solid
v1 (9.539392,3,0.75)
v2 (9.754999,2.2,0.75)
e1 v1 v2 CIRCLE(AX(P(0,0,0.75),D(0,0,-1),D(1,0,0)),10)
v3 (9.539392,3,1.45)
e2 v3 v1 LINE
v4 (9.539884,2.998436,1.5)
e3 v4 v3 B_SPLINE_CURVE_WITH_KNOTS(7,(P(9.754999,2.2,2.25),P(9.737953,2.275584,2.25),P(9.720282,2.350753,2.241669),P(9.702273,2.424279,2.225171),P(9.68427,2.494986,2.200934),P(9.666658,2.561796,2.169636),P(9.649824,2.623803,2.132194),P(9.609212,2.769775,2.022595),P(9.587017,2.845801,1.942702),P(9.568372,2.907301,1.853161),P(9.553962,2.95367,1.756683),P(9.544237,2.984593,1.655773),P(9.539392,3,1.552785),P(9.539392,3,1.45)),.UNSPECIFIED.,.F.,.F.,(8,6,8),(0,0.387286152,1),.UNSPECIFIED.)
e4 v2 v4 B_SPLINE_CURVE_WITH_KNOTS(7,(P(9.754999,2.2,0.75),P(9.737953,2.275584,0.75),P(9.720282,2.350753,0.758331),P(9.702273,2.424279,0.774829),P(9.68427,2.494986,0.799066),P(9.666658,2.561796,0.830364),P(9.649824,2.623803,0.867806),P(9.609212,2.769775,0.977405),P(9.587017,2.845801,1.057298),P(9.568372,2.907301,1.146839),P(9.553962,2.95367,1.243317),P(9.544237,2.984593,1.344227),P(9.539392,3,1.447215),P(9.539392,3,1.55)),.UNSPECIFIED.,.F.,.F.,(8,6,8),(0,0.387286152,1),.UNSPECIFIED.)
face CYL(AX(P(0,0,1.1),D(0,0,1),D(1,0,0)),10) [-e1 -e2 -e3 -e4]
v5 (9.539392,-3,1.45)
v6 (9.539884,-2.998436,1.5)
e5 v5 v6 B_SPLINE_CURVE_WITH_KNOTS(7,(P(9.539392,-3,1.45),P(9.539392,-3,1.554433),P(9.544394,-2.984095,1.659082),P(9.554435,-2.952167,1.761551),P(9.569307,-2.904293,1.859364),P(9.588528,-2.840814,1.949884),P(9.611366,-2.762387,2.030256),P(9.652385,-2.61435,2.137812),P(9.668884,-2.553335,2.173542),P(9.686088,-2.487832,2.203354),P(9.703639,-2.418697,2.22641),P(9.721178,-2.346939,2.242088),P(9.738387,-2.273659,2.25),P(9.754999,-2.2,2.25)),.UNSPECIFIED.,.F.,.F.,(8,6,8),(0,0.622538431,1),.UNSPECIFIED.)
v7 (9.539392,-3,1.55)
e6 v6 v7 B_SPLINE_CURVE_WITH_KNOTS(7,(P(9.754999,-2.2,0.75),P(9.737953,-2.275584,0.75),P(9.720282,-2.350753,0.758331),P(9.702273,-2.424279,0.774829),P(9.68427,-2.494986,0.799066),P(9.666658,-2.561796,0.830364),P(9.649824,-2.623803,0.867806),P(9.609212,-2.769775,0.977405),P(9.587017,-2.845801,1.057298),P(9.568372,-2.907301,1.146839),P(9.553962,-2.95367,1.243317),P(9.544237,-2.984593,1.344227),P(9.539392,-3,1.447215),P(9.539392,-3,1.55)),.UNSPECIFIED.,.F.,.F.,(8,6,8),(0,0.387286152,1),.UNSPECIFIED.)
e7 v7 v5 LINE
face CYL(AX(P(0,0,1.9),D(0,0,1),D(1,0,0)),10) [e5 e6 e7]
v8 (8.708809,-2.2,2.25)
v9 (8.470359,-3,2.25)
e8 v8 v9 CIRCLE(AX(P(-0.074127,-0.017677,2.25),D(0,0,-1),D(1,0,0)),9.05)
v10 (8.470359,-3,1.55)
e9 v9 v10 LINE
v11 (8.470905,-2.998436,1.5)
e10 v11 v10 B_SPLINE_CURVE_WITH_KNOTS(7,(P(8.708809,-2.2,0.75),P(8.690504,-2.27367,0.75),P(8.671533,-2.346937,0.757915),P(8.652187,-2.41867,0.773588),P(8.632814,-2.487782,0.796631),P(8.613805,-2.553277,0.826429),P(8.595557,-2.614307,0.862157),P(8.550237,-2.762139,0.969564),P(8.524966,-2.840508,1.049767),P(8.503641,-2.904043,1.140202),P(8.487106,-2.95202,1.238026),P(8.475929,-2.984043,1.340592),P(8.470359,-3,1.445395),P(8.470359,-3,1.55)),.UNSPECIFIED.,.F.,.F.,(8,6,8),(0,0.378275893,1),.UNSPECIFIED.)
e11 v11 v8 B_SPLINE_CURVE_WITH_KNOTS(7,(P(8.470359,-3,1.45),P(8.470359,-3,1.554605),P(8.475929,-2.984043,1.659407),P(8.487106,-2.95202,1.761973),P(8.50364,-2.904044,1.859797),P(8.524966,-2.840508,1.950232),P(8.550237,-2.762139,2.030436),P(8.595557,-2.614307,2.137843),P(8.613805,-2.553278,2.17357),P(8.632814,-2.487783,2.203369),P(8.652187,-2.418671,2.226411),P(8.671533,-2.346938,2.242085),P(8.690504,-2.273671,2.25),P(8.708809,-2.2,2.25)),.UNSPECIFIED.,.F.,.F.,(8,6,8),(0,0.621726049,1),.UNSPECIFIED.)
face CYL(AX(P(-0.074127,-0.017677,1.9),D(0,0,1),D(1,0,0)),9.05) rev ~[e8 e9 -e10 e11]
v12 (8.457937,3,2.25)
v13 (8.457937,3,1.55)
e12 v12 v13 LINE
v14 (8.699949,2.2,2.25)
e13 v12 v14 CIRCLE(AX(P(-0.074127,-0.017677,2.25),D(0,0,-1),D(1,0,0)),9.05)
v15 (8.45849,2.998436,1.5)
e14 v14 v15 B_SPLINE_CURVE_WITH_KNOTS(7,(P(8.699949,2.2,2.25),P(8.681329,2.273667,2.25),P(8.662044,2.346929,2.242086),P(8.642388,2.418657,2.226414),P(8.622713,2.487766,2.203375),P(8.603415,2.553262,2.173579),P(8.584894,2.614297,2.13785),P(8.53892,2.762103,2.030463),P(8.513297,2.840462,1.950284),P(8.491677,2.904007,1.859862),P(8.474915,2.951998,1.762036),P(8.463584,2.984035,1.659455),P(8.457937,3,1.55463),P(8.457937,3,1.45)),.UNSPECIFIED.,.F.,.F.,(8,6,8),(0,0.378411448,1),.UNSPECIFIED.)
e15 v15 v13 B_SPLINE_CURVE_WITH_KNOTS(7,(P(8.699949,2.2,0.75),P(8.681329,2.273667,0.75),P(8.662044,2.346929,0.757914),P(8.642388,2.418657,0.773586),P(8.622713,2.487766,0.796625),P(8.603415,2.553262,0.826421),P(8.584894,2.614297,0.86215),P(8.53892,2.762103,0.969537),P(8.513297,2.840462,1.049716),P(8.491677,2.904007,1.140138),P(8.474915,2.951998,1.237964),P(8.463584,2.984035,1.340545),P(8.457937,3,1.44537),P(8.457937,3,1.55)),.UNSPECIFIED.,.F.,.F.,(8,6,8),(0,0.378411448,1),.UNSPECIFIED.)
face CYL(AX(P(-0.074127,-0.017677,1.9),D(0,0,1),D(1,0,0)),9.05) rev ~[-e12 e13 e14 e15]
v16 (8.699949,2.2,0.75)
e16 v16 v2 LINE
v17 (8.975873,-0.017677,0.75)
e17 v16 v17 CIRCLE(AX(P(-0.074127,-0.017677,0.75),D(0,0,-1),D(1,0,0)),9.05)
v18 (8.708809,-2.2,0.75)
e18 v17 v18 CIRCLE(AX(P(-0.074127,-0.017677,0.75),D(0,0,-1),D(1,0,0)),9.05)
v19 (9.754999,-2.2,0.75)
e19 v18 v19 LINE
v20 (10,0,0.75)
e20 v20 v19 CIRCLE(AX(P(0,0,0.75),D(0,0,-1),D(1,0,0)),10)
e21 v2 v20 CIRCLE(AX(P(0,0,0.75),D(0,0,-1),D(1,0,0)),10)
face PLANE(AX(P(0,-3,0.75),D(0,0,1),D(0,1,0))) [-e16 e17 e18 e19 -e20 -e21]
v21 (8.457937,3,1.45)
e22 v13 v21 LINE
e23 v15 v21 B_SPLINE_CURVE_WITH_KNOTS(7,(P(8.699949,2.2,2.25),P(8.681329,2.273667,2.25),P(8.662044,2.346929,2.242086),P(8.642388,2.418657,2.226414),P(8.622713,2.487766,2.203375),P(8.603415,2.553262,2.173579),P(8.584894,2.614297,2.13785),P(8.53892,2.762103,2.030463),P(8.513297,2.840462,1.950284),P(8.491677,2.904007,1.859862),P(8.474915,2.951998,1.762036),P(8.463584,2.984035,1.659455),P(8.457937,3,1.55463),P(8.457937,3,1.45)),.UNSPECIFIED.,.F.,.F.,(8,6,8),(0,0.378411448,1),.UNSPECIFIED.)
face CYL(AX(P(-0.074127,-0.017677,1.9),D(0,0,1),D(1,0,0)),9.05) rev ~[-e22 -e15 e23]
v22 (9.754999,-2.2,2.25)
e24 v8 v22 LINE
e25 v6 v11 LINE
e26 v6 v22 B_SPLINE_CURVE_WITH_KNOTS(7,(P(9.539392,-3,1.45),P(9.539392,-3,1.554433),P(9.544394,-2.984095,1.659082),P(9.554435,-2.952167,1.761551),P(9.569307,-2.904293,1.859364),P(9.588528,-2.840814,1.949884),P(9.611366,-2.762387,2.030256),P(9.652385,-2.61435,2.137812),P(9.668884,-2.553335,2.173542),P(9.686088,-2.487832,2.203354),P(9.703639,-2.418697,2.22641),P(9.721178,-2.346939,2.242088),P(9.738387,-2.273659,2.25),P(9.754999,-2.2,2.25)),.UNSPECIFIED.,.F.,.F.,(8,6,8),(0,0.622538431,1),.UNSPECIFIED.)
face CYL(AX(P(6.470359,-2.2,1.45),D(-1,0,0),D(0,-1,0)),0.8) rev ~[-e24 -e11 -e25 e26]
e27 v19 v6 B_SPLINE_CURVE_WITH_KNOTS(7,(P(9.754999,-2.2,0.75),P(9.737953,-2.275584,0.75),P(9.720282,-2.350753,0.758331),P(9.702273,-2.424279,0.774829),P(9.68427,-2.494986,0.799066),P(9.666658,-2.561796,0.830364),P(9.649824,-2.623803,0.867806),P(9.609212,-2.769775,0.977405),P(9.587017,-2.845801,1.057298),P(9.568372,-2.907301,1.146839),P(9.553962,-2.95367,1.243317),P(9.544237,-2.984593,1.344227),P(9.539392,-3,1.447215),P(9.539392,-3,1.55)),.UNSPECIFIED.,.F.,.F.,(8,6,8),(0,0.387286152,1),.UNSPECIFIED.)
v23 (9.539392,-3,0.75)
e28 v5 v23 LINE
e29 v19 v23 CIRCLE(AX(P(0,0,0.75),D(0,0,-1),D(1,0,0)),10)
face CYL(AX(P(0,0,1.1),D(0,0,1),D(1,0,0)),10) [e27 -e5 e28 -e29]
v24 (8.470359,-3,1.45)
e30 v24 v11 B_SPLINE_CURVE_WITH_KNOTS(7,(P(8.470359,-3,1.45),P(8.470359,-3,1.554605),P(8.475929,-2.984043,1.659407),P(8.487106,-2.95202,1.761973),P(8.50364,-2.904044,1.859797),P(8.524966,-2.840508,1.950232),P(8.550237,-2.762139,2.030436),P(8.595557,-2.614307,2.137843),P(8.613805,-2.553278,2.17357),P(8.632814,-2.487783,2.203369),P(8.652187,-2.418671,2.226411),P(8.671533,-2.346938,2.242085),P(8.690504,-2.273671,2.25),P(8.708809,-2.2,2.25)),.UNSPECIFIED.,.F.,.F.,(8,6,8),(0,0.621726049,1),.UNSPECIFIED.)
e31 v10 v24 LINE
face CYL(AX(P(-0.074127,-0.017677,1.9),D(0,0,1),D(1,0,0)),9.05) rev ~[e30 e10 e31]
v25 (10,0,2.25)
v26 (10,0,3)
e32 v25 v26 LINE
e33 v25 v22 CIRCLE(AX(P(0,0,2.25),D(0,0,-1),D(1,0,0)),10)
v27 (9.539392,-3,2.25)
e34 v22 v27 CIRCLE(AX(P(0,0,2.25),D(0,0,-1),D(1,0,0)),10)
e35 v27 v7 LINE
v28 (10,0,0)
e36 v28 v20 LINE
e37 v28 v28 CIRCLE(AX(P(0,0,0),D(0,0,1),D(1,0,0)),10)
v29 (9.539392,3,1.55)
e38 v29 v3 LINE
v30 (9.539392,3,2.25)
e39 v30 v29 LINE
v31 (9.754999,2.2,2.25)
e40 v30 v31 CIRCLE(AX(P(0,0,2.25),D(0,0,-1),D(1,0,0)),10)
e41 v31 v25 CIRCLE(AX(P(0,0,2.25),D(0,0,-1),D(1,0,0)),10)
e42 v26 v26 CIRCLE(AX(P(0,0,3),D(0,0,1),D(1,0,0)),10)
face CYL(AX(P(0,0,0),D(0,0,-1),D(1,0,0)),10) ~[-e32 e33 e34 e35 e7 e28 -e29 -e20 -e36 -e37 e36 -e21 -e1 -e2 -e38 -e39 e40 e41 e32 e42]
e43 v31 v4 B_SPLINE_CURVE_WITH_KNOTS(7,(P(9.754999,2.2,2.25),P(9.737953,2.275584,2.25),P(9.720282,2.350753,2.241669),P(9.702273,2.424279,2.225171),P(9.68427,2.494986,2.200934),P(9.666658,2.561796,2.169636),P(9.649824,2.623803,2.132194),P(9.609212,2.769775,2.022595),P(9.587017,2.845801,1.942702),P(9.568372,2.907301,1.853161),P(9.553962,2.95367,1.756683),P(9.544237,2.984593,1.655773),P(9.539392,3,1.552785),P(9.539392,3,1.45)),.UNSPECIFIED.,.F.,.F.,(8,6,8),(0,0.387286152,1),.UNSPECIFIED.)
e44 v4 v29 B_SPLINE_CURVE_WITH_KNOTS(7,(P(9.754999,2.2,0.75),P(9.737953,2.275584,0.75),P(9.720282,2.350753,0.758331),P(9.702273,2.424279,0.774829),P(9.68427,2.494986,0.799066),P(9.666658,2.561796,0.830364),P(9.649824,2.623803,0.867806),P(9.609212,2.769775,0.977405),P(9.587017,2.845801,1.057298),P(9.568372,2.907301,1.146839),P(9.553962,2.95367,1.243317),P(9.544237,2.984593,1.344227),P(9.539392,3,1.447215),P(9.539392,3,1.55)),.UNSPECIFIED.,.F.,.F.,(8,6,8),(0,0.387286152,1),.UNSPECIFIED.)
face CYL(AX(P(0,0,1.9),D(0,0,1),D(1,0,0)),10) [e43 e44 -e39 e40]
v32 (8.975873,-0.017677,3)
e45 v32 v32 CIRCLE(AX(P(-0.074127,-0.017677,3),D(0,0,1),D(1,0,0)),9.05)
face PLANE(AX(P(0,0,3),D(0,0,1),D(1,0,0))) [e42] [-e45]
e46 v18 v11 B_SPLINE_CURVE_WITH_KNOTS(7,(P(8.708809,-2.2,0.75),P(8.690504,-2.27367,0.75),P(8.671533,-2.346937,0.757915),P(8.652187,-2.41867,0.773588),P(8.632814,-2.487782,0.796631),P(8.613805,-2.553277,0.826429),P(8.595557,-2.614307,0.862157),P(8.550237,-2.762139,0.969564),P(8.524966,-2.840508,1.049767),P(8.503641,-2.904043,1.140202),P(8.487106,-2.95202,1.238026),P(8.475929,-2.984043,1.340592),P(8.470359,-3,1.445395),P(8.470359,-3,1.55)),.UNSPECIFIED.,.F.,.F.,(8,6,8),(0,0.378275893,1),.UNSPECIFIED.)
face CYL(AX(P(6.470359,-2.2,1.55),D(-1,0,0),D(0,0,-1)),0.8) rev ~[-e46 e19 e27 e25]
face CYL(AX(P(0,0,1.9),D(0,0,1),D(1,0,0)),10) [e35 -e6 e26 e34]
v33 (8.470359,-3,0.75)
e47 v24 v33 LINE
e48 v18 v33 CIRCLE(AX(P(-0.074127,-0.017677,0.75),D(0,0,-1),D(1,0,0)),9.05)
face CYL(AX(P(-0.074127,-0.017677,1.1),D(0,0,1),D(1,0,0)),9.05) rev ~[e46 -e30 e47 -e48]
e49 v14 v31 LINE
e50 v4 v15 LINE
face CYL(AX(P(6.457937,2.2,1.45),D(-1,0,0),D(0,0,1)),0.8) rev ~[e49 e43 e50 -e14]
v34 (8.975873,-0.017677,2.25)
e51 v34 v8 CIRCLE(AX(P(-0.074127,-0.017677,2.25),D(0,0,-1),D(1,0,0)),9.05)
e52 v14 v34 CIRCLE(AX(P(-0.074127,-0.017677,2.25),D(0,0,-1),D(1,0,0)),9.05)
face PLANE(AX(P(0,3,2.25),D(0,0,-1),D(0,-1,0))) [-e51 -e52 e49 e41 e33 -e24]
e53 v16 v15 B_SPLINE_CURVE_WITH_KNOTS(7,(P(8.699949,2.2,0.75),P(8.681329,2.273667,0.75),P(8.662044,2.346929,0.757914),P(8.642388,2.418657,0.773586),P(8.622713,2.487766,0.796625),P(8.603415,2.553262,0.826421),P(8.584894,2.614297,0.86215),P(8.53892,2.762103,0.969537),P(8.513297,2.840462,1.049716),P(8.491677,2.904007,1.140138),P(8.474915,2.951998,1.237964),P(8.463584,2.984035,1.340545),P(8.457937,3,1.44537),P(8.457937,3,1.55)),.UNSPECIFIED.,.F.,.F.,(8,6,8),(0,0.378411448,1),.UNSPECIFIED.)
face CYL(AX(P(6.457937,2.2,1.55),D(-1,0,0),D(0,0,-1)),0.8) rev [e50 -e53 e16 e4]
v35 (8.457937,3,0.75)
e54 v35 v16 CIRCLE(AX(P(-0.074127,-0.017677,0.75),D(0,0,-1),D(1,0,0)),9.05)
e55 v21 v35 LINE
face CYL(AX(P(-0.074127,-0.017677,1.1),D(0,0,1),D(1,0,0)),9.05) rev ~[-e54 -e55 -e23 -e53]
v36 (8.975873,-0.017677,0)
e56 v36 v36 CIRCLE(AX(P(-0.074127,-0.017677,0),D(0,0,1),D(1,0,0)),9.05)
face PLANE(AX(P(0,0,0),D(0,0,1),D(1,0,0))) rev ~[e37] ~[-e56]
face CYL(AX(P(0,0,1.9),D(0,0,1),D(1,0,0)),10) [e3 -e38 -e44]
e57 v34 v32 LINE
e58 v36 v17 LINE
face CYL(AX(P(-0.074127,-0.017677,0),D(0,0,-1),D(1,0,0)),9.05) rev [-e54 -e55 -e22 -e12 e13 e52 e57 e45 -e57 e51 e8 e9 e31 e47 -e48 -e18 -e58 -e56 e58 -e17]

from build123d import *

# Parameters (mm, degrees)
F0_R         = 10
F0_R_2       = 9.05
F1_DEPTH     = 3
F3_DEPTH     = 25
F4_T4_DEPTH  = 5.0690329252
F4_S5_R      = 10
F4_T6_DEPTH  = 4
F4_S7_R      = 9.05
F4_T8_DEPTH  = 4
F4_T12_DEPTH = 5.0690329252
F4_S13_R     = 10
F4_T14_DEPTH = 4
F4_S15_R     = 9.05
F4_T16_DEPTH = 4
F4_T20_DEPTH = 5.0814545551
F4_S21_R     = 10
F4_T22_DEPTH = 4
F4_S23_R     = 9.05
F4_T24_DEPTH = 4
F4_T28_DEPTH = 5.0814545551
F4_S29_R     = 10
F4_T30_DEPTH = 4
F4_S31_R     = 9.05
F4_T32_DEPTH = 4


# Not quite as in the source:
# - a fillet or chamfer that OpenCascade refuses, or shapes differently, is made with other operations: its cross-section is extruded or revolved along the edge and cut away or added


with BuildPart() as f1:
    # F0 (on Top) → F1 (new body)
    with BuildSketch(Plane.XY):
        Circle(F0_R)
        with Locations((-0.0741272524, -0.0176765498)):
            Circle(F0_R_2, mode=Mode.SUBTRACT)
    extrude(amount=F1_DEPTH)

    # F2 (on Right) → F3 (cut)
    with BuildSketch(Plane.YZ):
        Polygon((3, 0.75), (3, 2.25), (-3, 2.25), (-3, 0.75), (0, 0.75), align=None)
    extrude(amount=F3_DEPTH, mode=Mode.SUBTRACT)

    # F4: fillet of radius 0.8 on 4 edges, made by hand


with BuildPart() as f4_tool2:
    # F4_s3 → F4_t4 (new body)
    with BuildSketch(Plane.YZ.offset(6.4703590889)):
        with BuildLine():
            ThreePointArc((-3, 1.45), (-2.7656854249, 2.0156854249), (-2.2, 2.25))
            Line((-2.2, 2.25), (-3, 2.25))
            Line((-3, 2.25), (-3, 1.45))
        make_face()
    extrude(amount=F4_T4_DEPTH)

    # F4_s5 → F4_t6 (intersect, symmetric)
    with BuildSketch(Plane.XY.offset(1.9)):
        Circle(F4_S5_R)
    extrude(amount=F4_T6_DEPTH, both=True, mode=Mode.INTERSECT)

    # F4_s7 → F4_t8 (cut, symmetric)
    with BuildSketch(Plane.XY.offset(1.9)):
        with Locations((-0.0741272524, -0.0176765498)):
            Circle(F4_S7_R)
    extrude(amount=F4_T8_DEPTH, both=True, mode=Mode.SUBTRACT)


with BuildPart() as f1_1:
    add(f1.part)

    # F4_t1: union F4_tool2
    add(f4_tool2.part)


with BuildPart() as f4_tool10:
    # F4_s11 → F4_t12 (new body)
    with BuildSketch(Plane.YZ.offset(6.4703590889)):
        with BuildLine():
            ThreePointArc((-2.2, 0.75), (-2.7656854249, 0.9843145751), (-3, 1.55))
            Line((-3, 1.55), (-3, 0.75))
            Line((-3, 0.75), (-2.2, 0.75))
        make_face()
    extrude(amount=F4_T12_DEPTH)

    # F4_s13 → F4_t14 (intersect, symmetric)
    with BuildSketch(Plane.XY.offset(1.1)):
        Circle(F4_S13_R)
    extrude(amount=F4_T14_DEPTH, both=True, mode=Mode.INTERSECT)

    # F4_s15 → F4_t16 (cut, symmetric)
    with BuildSketch(Plane.XY.offset(1.1)):
        with Locations((-0.0741272524, -0.0176765498)):
            Circle(F4_S15_R)
    extrude(amount=F4_T16_DEPTH, both=True, mode=Mode.SUBTRACT)


with BuildPart() as f1_2:
    add(f1_1.part)

    # F4_t9: union F4_tool10
    add(f4_tool10.part)


with BuildPart() as f4_tool18:
    # F4_s19 → F4_t20 (new body)
    with BuildSketch(Plane.YZ.offset(6.457937459)):
        with BuildLine():
            ThreePointArc((2.2, 2.25), (2.7656854249, 2.0156854249), (3, 1.45))
            Line((3, 1.45), (3, 2.25))
            Line((3, 2.25), (2.2, 2.25))
        make_face()
    extrude(amount=F4_T20_DEPTH)

    # F4_s21 → F4_t22 (intersect, symmetric)
    with BuildSketch(Plane.XY.offset(1.9)):
        Circle(F4_S21_R)
    extrude(amount=F4_T22_DEPTH, both=True, mode=Mode.INTERSECT)

    # F4_s23 → F4_t24 (cut, symmetric)
    with BuildSketch(Plane.XY.offset(1.9)):
        with Locations((-0.0741272524, -0.0176765498)):
            Circle(F4_S23_R)
    extrude(amount=F4_T24_DEPTH, both=True, mode=Mode.SUBTRACT)


with BuildPart() as f1_3:
    add(f1_2.part)

    # F4_t17: union F4_tool18
    add(f4_tool18.part)


with BuildPart() as f4_tool26:
    # F4_s27 → F4_t28 (new body)
    with BuildSketch(Plane.YZ.offset(6.457937459)):
        with BuildLine():
            ThreePointArc((2.2, 0.75), (2.7656854249, 0.9843145751), (3, 1.55))
            Line((3, 1.55), (3, 0.75))
            Line((3, 0.75), (2.2, 0.75))
        make_face()
    extrude(amount=F4_T28_DEPTH)

    # F4_s29 → F4_t30 (intersect, symmetric)
    with BuildSketch(Plane.XY.offset(1.1)):
        Circle(F4_S29_R)
    extrude(amount=F4_T30_DEPTH, both=True, mode=Mode.INTERSECT)

    # F4_s31 → F4_t32 (cut, symmetric)
    with BuildSketch(Plane.XY.offset(1.1)):
        with Locations((-0.0741272524, -0.0176765498)):
            Circle(F4_S31_R)
    extrude(amount=F4_T32_DEPTH, both=True, mode=Mode.SUBTRACT)


with BuildPart() as f1_4:
    add(f1_3.part)

    # F4_t25: union F4_tool26
    add(f4_tool26.part)


solid = f1_4.part
